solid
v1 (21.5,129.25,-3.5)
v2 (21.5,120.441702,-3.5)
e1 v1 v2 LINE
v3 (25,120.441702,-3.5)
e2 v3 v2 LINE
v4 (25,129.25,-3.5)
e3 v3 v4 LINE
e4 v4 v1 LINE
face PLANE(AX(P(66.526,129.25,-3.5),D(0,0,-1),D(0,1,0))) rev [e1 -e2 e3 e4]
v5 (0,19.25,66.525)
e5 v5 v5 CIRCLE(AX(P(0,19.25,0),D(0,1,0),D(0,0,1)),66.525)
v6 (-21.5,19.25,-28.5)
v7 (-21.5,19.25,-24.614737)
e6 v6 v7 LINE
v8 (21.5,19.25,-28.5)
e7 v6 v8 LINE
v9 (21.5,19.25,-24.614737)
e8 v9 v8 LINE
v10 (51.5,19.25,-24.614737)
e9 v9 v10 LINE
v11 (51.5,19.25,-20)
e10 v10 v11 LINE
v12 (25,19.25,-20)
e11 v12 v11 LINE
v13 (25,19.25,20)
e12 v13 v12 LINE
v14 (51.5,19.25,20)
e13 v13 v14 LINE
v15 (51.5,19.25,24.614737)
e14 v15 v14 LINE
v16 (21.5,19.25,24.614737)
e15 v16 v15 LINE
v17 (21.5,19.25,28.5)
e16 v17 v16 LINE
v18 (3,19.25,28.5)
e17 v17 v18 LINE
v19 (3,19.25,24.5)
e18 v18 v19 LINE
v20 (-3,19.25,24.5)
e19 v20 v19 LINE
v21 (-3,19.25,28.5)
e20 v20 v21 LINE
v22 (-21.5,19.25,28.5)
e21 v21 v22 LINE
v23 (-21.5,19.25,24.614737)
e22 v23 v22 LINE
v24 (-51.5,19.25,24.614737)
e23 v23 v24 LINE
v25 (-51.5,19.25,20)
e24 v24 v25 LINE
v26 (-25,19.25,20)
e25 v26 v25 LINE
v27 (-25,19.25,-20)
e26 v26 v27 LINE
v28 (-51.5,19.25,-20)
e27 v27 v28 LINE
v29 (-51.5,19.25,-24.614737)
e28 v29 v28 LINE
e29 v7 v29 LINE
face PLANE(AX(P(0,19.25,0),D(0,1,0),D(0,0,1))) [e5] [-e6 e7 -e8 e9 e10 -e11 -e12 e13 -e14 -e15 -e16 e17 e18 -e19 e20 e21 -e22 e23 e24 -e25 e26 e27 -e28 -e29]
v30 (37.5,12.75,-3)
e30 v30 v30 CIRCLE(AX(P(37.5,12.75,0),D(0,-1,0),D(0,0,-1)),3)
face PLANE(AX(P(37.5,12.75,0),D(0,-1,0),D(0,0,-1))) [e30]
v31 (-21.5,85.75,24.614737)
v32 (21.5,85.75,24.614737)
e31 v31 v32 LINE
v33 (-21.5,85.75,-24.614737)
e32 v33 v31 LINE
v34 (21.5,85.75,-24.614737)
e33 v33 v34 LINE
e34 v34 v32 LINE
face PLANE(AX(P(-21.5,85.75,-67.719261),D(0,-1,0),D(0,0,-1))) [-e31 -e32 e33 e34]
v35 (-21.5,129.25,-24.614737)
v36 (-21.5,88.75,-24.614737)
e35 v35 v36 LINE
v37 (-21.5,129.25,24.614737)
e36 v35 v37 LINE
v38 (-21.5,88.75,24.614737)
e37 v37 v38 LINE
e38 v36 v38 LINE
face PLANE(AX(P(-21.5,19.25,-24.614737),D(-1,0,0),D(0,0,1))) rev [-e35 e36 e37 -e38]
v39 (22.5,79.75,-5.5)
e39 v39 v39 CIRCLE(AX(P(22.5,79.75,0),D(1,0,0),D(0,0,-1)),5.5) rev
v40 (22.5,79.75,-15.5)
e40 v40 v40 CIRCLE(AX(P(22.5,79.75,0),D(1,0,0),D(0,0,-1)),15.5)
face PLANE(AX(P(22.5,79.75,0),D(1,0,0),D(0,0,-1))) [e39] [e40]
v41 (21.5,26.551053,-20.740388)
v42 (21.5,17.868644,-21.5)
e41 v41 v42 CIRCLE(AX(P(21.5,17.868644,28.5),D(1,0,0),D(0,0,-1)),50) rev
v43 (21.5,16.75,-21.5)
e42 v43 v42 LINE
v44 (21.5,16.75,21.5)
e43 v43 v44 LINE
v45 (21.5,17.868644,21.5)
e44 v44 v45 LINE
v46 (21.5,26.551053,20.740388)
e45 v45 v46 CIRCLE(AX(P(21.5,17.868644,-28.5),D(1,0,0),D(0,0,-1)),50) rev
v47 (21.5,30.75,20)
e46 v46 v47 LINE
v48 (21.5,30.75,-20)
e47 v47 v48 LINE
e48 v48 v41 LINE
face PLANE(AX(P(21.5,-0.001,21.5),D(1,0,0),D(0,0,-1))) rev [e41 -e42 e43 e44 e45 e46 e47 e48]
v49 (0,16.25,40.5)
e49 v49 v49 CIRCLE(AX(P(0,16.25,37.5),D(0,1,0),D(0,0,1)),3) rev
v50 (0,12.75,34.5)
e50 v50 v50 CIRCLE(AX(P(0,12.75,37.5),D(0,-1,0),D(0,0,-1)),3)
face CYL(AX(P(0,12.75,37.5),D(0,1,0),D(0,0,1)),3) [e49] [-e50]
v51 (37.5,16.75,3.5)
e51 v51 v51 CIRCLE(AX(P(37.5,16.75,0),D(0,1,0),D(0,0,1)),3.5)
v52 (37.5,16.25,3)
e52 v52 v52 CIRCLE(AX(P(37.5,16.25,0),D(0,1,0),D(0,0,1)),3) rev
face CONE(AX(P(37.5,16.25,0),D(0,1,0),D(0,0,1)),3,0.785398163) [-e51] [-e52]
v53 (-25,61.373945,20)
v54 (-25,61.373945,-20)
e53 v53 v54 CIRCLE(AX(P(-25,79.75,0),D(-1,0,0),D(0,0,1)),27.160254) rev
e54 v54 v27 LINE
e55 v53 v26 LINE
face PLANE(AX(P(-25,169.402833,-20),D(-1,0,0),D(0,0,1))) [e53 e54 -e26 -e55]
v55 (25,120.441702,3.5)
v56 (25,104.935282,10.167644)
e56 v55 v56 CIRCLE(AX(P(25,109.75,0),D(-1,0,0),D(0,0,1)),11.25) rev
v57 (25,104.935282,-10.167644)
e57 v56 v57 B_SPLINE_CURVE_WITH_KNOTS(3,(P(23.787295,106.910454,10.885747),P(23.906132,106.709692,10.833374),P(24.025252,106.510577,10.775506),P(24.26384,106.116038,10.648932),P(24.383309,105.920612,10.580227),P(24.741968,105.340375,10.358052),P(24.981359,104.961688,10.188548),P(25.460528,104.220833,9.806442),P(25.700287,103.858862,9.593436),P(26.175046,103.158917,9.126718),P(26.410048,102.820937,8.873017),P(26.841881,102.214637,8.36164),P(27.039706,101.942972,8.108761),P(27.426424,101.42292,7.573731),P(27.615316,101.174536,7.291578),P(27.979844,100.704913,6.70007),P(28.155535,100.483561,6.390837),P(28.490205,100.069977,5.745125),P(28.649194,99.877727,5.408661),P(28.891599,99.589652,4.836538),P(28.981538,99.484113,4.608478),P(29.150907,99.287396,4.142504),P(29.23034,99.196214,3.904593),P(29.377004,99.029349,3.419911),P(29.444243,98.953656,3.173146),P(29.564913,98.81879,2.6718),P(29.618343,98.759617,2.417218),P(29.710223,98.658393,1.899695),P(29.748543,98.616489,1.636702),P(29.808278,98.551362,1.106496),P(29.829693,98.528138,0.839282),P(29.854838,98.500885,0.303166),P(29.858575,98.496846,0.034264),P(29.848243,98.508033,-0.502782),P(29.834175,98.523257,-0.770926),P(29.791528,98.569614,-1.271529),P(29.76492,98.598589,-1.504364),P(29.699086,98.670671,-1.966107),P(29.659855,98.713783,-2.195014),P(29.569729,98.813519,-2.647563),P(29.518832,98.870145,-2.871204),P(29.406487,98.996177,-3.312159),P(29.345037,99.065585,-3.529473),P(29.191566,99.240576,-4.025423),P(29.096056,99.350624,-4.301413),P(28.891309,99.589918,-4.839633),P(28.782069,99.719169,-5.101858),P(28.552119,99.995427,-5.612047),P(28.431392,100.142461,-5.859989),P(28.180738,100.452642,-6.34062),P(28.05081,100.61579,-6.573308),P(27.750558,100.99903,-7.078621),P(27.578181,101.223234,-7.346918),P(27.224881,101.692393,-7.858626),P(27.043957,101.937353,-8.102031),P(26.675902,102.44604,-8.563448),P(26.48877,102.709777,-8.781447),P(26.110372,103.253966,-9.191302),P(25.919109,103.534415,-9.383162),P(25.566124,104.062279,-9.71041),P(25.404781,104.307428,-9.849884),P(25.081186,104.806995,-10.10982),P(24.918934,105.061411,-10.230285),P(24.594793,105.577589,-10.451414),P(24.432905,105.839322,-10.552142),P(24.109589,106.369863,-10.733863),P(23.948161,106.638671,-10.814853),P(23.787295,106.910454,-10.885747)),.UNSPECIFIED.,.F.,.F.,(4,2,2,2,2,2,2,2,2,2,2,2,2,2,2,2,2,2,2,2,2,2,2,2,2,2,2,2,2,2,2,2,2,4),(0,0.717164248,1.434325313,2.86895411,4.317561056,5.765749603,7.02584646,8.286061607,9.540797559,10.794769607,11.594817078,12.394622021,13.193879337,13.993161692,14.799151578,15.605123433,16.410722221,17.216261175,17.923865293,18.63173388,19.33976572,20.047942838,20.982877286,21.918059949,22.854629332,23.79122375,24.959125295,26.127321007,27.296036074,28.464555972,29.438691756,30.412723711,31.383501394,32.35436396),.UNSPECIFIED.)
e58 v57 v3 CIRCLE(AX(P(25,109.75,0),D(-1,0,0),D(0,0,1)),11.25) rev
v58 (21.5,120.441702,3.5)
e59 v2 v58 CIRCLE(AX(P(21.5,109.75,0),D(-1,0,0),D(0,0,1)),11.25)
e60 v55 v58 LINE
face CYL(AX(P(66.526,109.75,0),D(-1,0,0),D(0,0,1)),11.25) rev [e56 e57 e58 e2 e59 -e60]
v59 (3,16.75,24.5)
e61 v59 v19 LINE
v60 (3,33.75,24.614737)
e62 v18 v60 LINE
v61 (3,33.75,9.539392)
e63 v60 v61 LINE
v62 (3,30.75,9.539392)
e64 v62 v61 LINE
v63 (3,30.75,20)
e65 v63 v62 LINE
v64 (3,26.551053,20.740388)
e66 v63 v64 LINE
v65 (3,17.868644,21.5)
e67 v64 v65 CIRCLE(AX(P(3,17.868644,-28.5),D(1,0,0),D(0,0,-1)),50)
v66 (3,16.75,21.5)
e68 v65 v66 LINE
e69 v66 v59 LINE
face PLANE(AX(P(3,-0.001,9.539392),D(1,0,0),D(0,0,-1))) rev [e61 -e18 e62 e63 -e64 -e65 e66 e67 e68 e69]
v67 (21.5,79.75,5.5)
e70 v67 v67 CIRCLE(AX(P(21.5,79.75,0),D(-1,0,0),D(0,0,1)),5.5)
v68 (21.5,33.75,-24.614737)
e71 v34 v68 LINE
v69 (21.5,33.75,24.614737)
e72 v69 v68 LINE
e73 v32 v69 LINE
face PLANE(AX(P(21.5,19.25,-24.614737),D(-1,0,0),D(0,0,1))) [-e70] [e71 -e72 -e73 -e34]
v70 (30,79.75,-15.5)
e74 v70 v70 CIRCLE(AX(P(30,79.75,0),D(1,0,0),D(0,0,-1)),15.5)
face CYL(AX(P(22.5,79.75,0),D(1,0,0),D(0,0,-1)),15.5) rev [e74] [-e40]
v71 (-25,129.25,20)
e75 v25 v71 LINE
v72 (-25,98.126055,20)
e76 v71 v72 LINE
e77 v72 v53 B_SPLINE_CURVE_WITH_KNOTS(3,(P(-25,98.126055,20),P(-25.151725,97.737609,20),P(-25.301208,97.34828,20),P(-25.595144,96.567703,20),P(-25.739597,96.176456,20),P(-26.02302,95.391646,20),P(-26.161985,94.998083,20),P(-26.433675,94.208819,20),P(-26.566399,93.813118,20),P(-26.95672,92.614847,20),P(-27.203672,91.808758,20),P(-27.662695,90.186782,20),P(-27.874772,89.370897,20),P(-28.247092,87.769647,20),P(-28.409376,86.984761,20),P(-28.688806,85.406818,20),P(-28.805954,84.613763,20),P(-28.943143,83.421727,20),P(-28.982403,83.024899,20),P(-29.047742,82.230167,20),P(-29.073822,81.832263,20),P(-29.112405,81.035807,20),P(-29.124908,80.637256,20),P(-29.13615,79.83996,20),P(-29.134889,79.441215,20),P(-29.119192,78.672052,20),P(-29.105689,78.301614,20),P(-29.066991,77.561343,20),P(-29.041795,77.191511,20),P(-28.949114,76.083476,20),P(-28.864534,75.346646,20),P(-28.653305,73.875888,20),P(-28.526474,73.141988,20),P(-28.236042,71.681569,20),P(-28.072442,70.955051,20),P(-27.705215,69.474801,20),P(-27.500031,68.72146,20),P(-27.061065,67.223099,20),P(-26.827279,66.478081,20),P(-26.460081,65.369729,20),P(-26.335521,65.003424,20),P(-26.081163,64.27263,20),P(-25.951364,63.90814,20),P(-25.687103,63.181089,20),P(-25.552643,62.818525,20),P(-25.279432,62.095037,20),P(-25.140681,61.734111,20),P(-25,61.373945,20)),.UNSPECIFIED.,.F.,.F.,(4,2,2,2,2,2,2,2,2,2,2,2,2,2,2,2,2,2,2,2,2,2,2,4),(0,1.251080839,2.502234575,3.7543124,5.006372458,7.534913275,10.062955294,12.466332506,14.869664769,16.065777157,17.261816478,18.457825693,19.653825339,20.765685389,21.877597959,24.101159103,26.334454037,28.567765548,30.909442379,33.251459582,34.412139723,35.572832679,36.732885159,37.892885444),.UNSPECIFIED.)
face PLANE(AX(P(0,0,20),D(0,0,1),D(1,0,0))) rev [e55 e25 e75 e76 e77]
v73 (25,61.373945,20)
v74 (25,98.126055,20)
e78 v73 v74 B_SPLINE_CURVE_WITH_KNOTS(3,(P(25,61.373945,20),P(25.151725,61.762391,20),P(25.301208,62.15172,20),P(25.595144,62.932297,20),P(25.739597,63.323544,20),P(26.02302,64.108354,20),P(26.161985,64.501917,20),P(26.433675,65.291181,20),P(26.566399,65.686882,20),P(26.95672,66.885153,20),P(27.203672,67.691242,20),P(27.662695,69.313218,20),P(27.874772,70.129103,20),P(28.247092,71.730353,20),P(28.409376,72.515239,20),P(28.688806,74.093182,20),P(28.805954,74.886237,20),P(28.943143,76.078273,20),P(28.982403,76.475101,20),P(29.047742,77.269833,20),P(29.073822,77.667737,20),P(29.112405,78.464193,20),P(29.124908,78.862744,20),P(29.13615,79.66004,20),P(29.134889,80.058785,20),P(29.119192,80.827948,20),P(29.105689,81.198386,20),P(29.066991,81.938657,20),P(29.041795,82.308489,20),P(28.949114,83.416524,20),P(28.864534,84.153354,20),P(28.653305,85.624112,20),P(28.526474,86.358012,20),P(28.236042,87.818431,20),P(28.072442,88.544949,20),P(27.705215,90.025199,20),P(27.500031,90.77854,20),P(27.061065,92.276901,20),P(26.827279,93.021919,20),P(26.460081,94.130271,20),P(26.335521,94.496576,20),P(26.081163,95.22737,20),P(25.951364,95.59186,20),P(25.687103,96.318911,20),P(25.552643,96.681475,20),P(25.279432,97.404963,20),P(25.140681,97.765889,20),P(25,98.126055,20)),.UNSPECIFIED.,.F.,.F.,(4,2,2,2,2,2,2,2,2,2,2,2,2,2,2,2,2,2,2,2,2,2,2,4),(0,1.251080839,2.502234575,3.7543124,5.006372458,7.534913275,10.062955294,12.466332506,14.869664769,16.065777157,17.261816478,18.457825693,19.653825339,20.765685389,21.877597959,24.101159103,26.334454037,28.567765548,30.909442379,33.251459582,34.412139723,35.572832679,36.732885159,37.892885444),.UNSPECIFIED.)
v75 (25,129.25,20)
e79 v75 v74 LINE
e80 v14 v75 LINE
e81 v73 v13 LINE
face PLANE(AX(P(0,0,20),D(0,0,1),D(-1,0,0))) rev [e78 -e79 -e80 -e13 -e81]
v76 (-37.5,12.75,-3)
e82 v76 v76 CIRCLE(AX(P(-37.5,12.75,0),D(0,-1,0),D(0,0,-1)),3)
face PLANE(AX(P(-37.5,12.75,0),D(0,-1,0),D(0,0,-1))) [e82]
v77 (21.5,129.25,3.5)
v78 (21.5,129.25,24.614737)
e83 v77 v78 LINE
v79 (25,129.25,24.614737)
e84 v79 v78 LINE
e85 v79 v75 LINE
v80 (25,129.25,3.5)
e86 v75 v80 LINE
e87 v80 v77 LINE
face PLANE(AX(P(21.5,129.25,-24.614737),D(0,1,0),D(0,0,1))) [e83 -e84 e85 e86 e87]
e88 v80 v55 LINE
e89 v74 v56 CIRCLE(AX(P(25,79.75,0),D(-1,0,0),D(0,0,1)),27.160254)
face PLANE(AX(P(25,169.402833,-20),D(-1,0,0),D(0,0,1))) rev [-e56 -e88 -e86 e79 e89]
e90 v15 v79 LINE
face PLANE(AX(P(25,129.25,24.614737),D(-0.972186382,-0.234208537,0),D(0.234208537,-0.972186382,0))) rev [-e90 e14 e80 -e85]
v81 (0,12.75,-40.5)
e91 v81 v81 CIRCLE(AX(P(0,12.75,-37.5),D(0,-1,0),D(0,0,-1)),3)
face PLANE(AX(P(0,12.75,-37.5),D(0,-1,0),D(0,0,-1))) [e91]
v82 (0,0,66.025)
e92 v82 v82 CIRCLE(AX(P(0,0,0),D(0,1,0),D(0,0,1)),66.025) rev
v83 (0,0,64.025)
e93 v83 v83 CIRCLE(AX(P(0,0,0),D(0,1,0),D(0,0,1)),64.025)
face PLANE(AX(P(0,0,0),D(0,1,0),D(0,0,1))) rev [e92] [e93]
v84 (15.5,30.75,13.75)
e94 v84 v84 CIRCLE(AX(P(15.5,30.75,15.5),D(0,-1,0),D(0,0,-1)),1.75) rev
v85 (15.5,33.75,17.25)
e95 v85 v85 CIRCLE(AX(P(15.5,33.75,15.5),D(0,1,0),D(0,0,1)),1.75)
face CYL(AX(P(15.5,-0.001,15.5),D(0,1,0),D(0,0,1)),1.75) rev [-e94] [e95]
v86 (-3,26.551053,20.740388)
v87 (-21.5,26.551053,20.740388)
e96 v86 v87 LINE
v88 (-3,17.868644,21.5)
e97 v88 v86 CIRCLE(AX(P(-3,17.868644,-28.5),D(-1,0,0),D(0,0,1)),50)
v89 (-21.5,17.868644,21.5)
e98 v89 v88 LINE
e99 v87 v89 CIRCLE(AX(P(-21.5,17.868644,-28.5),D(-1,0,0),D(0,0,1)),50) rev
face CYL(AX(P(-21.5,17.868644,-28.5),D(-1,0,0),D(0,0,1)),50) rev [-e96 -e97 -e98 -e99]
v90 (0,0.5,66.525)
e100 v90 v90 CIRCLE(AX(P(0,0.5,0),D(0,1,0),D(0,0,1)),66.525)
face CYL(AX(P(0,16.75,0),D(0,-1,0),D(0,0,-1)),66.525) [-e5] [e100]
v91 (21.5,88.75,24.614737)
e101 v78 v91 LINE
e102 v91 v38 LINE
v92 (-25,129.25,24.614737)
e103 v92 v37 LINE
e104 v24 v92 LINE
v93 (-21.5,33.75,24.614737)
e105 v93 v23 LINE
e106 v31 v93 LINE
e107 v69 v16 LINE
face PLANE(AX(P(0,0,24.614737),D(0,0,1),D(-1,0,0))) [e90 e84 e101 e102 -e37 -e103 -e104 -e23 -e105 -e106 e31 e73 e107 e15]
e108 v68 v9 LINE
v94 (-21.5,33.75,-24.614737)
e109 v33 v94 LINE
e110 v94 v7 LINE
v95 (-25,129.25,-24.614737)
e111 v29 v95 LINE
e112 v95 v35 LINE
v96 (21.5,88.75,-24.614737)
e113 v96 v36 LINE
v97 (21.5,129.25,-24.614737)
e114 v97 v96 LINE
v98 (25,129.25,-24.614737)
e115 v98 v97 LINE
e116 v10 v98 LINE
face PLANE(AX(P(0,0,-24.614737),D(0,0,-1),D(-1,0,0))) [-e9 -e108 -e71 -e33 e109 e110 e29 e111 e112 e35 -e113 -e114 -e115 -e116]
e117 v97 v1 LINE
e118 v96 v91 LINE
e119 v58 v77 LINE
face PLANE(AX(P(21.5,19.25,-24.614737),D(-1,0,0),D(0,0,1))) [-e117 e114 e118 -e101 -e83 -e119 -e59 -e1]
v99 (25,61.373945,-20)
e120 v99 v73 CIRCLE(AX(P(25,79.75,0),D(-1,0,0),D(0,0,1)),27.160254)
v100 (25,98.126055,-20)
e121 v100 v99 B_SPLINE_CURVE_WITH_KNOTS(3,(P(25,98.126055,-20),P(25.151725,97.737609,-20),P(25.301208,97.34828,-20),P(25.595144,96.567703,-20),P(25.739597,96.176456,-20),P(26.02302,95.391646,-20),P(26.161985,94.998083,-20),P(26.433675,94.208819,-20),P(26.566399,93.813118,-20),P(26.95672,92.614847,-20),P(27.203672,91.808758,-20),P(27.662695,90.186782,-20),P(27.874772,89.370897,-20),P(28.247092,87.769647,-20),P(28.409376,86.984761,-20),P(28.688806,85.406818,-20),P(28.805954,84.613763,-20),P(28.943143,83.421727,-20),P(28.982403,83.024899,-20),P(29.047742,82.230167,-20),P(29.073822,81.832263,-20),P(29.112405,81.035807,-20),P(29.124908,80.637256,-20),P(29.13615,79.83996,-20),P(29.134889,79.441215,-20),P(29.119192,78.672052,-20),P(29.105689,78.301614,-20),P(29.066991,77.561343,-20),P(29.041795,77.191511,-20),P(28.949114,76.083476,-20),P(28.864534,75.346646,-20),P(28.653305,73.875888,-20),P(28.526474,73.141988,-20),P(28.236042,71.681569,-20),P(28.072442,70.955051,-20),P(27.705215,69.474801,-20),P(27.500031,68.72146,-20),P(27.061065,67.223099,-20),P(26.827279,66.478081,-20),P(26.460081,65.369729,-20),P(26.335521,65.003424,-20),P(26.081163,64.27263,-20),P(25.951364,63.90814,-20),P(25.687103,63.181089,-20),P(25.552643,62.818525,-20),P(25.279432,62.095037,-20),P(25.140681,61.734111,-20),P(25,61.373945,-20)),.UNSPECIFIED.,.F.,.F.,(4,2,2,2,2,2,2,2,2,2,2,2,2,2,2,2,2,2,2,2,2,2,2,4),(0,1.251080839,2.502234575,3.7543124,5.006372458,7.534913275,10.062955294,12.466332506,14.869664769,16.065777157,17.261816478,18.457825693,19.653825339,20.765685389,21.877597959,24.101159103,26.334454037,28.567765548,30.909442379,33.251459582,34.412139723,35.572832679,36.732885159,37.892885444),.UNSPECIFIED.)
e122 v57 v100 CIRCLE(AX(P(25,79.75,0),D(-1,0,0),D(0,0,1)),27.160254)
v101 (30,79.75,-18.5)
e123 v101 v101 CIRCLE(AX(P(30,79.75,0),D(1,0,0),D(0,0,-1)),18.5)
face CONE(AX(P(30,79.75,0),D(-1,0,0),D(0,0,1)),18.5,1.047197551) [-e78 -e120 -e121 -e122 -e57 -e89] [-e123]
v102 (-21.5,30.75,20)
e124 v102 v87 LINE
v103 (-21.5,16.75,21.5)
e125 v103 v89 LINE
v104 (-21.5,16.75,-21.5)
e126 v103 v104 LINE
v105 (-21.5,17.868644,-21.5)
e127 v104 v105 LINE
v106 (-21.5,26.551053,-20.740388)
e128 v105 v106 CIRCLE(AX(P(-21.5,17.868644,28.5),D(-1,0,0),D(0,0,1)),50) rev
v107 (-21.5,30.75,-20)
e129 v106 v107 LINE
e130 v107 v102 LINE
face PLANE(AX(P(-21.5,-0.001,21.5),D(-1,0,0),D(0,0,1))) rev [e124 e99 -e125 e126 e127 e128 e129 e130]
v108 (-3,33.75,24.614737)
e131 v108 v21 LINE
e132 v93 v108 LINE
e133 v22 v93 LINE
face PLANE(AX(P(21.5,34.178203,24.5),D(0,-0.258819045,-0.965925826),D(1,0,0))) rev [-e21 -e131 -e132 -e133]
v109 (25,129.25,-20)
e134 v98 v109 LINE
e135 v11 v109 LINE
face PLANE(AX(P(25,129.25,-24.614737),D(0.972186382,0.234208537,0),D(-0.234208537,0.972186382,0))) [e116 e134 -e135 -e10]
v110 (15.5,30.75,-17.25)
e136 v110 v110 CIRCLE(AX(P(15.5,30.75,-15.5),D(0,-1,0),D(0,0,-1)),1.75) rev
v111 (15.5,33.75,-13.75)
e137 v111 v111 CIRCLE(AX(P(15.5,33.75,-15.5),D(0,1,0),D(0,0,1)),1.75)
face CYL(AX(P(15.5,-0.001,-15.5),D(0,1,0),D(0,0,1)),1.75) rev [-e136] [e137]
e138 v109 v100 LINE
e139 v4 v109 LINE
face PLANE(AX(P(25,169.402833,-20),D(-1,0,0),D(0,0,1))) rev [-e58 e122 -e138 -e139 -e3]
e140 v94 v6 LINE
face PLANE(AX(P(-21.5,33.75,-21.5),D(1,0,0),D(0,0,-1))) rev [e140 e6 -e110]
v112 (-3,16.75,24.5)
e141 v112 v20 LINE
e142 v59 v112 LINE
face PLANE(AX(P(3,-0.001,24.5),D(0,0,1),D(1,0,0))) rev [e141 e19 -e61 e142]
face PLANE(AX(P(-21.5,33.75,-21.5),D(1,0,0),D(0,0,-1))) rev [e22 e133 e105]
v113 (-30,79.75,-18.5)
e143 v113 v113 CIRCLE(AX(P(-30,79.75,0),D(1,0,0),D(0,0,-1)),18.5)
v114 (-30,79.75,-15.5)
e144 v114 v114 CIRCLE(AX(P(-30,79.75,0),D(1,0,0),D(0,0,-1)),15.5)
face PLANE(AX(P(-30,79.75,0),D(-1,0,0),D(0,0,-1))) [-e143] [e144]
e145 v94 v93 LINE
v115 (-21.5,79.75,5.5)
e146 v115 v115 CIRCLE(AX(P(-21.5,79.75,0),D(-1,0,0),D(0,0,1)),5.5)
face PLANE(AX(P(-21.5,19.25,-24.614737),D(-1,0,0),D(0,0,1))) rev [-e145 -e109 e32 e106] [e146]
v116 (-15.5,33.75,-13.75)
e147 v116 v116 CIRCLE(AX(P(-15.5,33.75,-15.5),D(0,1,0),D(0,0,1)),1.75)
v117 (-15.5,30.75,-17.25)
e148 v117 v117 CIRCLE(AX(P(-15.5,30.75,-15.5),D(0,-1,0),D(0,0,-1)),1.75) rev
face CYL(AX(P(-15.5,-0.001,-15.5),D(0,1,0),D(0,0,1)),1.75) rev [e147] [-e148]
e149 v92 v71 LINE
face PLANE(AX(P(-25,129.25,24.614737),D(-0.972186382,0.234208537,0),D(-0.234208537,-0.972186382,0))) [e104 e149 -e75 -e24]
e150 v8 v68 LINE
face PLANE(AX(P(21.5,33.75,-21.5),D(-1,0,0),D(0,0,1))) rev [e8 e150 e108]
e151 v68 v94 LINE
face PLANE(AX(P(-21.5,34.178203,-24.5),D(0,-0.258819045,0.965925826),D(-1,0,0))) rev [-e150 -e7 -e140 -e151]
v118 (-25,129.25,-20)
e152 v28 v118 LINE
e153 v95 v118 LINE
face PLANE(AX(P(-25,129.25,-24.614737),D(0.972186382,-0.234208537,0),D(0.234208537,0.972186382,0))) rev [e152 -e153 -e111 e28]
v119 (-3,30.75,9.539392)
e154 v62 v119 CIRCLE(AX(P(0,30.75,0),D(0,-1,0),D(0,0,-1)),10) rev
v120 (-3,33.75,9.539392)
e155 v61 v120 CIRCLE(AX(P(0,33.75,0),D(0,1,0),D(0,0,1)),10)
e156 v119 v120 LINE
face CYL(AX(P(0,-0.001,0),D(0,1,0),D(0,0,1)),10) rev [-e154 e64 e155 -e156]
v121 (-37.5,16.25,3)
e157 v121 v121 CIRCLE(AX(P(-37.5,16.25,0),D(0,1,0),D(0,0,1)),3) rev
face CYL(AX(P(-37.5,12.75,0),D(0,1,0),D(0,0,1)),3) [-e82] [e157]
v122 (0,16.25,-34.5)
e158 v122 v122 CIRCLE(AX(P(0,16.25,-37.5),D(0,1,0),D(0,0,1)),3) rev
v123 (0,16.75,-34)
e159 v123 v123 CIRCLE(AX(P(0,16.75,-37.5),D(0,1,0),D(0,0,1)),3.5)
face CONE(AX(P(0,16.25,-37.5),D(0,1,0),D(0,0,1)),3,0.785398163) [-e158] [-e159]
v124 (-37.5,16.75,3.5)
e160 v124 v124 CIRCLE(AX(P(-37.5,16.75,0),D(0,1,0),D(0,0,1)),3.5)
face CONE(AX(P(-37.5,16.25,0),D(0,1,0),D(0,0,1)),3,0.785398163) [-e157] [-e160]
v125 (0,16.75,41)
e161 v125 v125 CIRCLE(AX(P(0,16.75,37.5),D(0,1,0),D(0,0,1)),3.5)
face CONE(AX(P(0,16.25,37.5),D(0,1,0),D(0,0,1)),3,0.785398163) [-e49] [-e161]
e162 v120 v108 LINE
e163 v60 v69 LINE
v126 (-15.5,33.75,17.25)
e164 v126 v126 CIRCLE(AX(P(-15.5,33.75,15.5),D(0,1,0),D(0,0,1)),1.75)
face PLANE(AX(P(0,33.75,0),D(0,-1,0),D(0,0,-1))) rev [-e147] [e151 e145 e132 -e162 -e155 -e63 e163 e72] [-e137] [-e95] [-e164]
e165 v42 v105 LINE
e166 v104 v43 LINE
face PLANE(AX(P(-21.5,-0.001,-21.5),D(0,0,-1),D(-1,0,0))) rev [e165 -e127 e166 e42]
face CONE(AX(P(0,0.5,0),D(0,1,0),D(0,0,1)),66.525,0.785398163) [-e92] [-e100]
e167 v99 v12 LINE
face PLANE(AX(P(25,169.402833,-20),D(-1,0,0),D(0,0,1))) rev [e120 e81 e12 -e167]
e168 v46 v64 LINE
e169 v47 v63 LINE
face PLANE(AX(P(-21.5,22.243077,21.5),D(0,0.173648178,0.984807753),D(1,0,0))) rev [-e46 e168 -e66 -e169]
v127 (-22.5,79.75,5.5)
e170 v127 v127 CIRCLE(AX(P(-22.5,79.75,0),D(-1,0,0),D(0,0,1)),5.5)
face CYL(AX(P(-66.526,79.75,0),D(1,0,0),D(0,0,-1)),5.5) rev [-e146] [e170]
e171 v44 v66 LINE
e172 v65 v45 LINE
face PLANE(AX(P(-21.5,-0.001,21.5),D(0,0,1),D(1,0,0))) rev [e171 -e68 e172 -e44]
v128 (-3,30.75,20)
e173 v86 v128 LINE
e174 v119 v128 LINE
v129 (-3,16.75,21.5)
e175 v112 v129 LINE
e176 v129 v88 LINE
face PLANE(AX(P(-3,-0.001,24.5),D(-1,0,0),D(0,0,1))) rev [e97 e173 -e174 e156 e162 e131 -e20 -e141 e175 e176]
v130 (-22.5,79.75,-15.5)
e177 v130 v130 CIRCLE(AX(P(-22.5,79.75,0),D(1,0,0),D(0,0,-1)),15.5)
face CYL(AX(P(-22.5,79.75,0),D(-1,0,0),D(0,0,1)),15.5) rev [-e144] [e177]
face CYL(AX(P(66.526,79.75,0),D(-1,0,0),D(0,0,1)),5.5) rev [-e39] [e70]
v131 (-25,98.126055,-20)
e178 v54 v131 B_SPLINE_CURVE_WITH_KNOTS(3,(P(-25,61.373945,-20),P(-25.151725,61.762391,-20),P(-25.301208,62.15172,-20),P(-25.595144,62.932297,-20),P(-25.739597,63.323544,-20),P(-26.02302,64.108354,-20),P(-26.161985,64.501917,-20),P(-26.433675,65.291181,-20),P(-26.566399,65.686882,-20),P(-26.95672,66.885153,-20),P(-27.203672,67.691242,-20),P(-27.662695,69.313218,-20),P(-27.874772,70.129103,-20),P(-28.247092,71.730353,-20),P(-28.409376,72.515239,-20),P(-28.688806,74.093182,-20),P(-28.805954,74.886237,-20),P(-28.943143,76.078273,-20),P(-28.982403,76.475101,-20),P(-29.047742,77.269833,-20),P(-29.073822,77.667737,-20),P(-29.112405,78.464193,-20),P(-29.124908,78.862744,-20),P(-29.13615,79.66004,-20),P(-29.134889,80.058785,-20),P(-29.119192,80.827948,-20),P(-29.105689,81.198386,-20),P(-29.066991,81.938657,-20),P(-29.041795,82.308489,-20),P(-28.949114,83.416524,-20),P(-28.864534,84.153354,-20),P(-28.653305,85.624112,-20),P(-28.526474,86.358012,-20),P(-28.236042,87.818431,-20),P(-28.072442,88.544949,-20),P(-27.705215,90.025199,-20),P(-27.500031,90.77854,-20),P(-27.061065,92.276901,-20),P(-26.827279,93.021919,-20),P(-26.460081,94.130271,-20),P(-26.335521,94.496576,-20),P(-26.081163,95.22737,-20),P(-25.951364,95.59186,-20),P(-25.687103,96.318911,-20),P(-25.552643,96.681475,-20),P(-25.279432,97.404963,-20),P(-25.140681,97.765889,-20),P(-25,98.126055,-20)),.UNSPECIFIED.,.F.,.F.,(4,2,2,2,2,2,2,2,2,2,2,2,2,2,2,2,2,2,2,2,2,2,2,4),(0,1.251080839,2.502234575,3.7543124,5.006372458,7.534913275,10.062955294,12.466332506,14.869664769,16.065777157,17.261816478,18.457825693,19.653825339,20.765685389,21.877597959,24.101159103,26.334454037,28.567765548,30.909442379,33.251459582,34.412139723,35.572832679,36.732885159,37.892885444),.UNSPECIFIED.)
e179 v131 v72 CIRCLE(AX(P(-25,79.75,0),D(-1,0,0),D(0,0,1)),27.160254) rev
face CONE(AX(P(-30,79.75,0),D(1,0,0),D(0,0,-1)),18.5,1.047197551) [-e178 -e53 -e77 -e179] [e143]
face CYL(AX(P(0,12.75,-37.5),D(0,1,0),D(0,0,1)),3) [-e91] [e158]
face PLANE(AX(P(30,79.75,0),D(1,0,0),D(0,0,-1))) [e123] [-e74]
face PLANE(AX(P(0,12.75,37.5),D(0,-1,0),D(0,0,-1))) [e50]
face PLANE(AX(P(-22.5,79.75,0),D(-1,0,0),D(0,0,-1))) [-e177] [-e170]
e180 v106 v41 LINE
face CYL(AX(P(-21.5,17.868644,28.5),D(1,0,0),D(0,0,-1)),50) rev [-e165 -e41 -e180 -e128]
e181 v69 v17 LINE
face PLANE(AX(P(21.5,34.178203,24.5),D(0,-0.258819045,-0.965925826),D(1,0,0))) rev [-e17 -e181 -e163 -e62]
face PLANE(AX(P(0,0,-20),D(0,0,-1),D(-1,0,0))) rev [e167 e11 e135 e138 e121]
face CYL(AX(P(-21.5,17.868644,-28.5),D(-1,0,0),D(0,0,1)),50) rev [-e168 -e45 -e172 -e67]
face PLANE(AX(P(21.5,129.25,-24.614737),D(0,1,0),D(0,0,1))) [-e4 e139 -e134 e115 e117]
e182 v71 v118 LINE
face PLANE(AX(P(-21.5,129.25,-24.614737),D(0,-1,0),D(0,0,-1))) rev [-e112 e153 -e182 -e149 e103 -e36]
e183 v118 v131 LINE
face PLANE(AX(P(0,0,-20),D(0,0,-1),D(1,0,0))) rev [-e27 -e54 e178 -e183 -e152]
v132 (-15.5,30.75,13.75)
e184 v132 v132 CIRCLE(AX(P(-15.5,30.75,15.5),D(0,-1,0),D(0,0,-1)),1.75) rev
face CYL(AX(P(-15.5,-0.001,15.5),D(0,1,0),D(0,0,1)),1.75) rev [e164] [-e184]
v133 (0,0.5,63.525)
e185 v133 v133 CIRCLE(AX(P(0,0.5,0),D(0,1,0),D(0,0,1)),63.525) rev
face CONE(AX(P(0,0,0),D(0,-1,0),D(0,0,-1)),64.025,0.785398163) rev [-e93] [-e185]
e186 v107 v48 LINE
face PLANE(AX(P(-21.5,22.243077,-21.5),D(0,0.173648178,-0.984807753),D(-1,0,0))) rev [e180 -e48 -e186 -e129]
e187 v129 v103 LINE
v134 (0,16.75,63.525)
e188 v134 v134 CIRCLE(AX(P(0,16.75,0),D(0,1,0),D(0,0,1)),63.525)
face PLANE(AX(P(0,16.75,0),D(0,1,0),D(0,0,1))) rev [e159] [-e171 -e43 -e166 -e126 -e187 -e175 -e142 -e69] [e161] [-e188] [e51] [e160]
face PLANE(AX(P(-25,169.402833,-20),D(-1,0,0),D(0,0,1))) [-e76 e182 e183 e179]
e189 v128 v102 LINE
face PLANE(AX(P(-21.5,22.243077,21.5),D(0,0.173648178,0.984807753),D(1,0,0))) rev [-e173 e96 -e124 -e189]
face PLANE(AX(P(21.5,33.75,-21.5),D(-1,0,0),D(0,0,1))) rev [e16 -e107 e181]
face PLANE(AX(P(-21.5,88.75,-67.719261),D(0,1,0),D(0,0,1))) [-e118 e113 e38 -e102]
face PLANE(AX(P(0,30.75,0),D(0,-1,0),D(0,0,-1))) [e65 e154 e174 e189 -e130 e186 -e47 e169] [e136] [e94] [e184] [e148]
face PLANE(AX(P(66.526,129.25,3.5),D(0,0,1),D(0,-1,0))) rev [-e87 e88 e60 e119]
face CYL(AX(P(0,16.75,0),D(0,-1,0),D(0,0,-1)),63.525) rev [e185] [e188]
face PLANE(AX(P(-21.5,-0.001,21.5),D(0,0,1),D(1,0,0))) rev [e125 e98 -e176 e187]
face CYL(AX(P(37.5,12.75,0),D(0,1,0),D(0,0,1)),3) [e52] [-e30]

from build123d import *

# Parameters (mm, degrees)
SKETCH1_R            = 66.525
SKETCH1_R_2          = 63.525
BOSS_EXTRUDE1_DEPTH  = 16.75
SKETCH2_R            = 66.525
BOSS_EXTRUDE2_DEPTH  = 2.5
CHAMFER1_SIZE        = 0.5
SKETCH3_R            = 3
BOSS_EXTRUDE3_DEPTH  = 4
CHAMFER2_SIZE        = 0.5
CUT_EXTRUDE1_REACH   = 98.03
SKETCH4_W            = 43
SKETCH4_H            = 43
SKETCH5_W            = 43
SKETCH5_H            = 3
BOSS_EXTRUDE4_DEPTH  = 14.5
SKETCH6_W            = 43
SKETCH6_H            = 49
BOSS_EXTRUDE5_DEPTH  = 3
CUT_EXTRUDE2_REACH   = 101.951
SKETCH7_R            = 1.75
CHAMFER3_SIZE        = 4
CHAMFER3_SIZE_2      = 14.92820323
CHAMFER5_SIZE        = 1.5
CHAMFER5_SIZE2       = 8.506922729
FILLET1_R            = 50
BOSS_EXTRUDE6_DEPTH  = 4.614737
SKETCH10_W           = 3.5
SKETCH10_H           = 40
BOSS_EXTRUDE7_DEPTH  = 110
CUT_EXTRUDE3_REACH   = 171.94
SKETCH11_R           = 5.5
SKETCH12_R           = 15.5
CUT_EXTRUDE4_DEPTH   = 2.5
BOSS_EXTRUDE8_START  = 5
SKETCH13_R           = 18.5
SKETCH13_R_2         = 15.5
BOSS_EXTRUDE8_DEPTH  = 5
MIRROR4_COPY_1_DEPTH = 4.614737
CHAMFER7_SIZE        = 8.660254038
CHAMFER7_SIZE_2      = 5
SKETCH14_W           = 43
SKETCH14_H           = 3
BOSS_EXTRUDE9_DEPTH  = 49.229473419
CUT_EXTRUDE5_REACH   = 171.94


with BuildPart() as part:
    # Sketch1 → Boss-Extrude1 (new body)
    with BuildSketch(Plane(origin=(0, 0, 0), x_dir=(1, 0, 0), z_dir=(0, 1, 0))):
        with Locations(Location((0, 0, 0), (0, 0, 270))):
            Circle(SKETCH1_R)
        with Locations(Location((0, 0, 0), (0, 0, 270))):
            Circle(SKETCH1_R_2, mode=Mode.SUBTRACT)
    extrude(amount=BOSS_EXTRUDE1_DEPTH)

    # Sketch2 → Boss-Extrude2 (add)
    with BuildSketch(Plane(origin=(0, 16.75, 0), x_dir=(1, 0, 0), z_dir=(0, 1, 0))):
        with Locations(Location((0, 0, 0), (0, 0, 270))):
            Circle(SKETCH2_R)
    extrude(amount=BOSS_EXTRUDE2_DEPTH)

    # Chamfer1
    chamfer1_edges = [part.edges().sort_by_distance(p)[0] for p in [
        (0, 0, -66.525),
        (0, 0, -63.525),
    ]]
    chamfer(chamfer1_edges, length=CHAMFER1_SIZE)

    # Sketch3 → Boss-Extrude3 (add)
    with BuildSketch(Plane.XZ.offset(-16.75)):
        with Locations(Location((0, 37.5, 0), (0, 0, 90))):
            Circle(SKETCH3_R)
        with Locations(Location((37.5, 0, 0), (0, 0, 90))):
            Circle(SKETCH3_R)
        with Locations(Location((0, -37.5, 0), (0, 0, 90))):
            Circle(SKETCH3_R)
        with Locations(Location((-37.5, 0, 0), (0, 0, 90))):
            Circle(SKETCH3_R)
    extrude(amount=BOSS_EXTRUDE3_DEPTH)

    # Chamfer2
    chamfer2_edges = [part.edges().sort_by_distance(p)[0] for p in [
        (0, 16.75, 34.5),
        (37.5, 16.75, -3),
        (0, 16.75, -40.5),
        (-37.5, 16.75, -3),
    ]]
    chamfer(chamfer2_edges, length=CHAMFER2_SIZE)

    # Sketch4 → Cut-Extrude1 (cut, up to next)
    with BuildSketch(Plane(origin=(0, 19.25, 0), x_dir=(1, 0, 0), z_dir=(0, 1, 0)), mode=Mode.PRIVATE) as cut_extrude1_sk1:
        Rectangle(SKETCH4_W, SKETCH4_H)
    cut_extrude1_tool1 = extrude(cut_extrude1_sk1.sketch, amount=-CUT_EXTRUDE1_REACH, mode=Mode.PRIVATE) & part.part
    add(cut_extrude1_tool1.solids().sort_by_distance((0, 19.25, 0))[0], mode=Mode.SUBTRACT)

    # Sketch5 → Boss-Extrude4 (add)
    with BuildSketch(Plane(origin=(0, 19.25, 0), x_dir=(1, 0, 0), z_dir=(0, 1, 0))):
        with Locations((0, 23)):
            Rectangle(SKETCH5_W, SKETCH5_H)
        with Locations((0, -23)):
            Rectangle(SKETCH5_W, SKETCH5_H)
    extrude(amount=BOSS_EXTRUDE4_DEPTH)

    # Sketch6 → Boss-Extrude5 (add)
    with BuildSketch(Plane(origin=(0, 33.75, 0), x_dir=(1, 0, 0), z_dir=(0, 1, 0))):
        Rectangle(SKETCH6_W, SKETCH6_H)
    extrude(amount=-BOSS_EXTRUDE5_DEPTH)

    # Sketch7 → Cut-Extrude2 (cut, up to next)
    with BuildSketch(Plane(origin=(0, 33.75, 0), x_dir=(1, 0, 0), z_dir=(0, 1, 0)), mode=Mode.PRIVATE) as cut_extrude2_sk1:
        with Locations(Location((15.5, 15.5, 0), (0, 0, 270))):
            Circle(SKETCH7_R)
    cut_extrude2_tool1 = extrude(cut_extrude2_sk1.sketch, amount=-CUT_EXTRUDE2_REACH, mode=Mode.PRIVATE) & part.part
    # Sketch7 → Cut-Extrude2 (cut, up to next)
    with BuildSketch(Plane(origin=(0, 33.75, 0), x_dir=(1, 0, 0), z_dir=(0, 1, 0)), mode=Mode.PRIVATE) as cut_extrude2_sk2:
        with Locations(Location((-15.5, 15.5, 0), (0, 0, 270))):
            Circle(SKETCH7_R)
    cut_extrude2_tool2 = extrude(cut_extrude2_sk2.sketch, amount=-CUT_EXTRUDE2_REACH, mode=Mode.PRIVATE) & part.part
    # Sketch7 → Cut-Extrude2 (cut, up to next)
    with BuildSketch(Plane(origin=(0, 33.75, 0), x_dir=(1, 0, 0), z_dir=(0, 1, 0)), mode=Mode.PRIVATE) as cut_extrude2_sk3:
        with Locations(Location((-15.5, -15.5, 0), (0, 0, 270))):
            Circle(SKETCH7_R)
    cut_extrude2_tool3 = extrude(cut_extrude2_sk3.sketch, amount=-CUT_EXTRUDE2_REACH, mode=Mode.PRIVATE) & part.part
    # Sketch7 → Cut-Extrude2 (cut, up to next)
    with BuildSketch(Plane(origin=(0, 33.75, 0), x_dir=(1, 0, 0), z_dir=(0, 1, 0)), mode=Mode.PRIVATE) as cut_extrude2_sk4:
        with Locations(Location((15.5, -15.5, 0), (0, 0, 270))):
            Circle(SKETCH7_R)
    cut_extrude2_tool4 = extrude(cut_extrude2_sk4.sketch, amount=-CUT_EXTRUDE2_REACH, mode=Mode.PRIVATE) & part.part
    # Sketch7 → Cut-Extrude2 (cut, up to next)
    with BuildSketch(Plane(origin=(0, 33.75, 0), x_dir=(1, 0, 0), z_dir=(0, 1, 0)), mode=Mode.PRIVATE) as cut_extrude2_sk5:
        with BuildLine():
            Line((-3, -24.5), (-3, -9.539392014))
            ThreePointArc((-3, -9.539392014), (0, 10), (3, -9.539392014))
            Line((3, -9.539392014), (3, -24.5))
            Line((3, -24.5), (-3, -24.5))
        make_face()
    cut_extrude2_tool5 = extrude(cut_extrude2_sk5.sketch, amount=-CUT_EXTRUDE2_REACH, mode=Mode.PRIVATE) & part.part
    add(cut_extrude2_tool1.solids().sort_by_distance((15.5, 33.75, -15.5))[0], mode=Mode.SUBTRACT)
    add(cut_extrude2_tool2.solids().sort_by_distance((-15.5, 33.75, -15.5))[0], mode=Mode.SUBTRACT)
    add(cut_extrude2_tool3.solids().sort_by_distance((-15.5, 33.75, 15.5))[0], mode=Mode.SUBTRACT)
    add(cut_extrude2_tool4.solids().sort_by_distance((15.5, 33.75, 15.5))[0], mode=Mode.SUBTRACT)
    add(cut_extrude2_tool5.solids().sort_by_distance((0, 33.75, 3.754926))[0], mode=Mode.SUBTRACT)

    # Chamfer3
    # the kernel refuses this chamfer: 14.92820323, 4 mm, written as the material it adds along each edge
    with BuildSketch(Plane(origin=(-35.764387332, 19.25, 24.5), x_dir=(0, -0.13751244702129095, 0.9905000388259542), z_dir=(1, 0, 0))) as chamfer3_piece_1_section:
        Polygon((CHAMFER3_SIZE * 0.990500038826, -CHAMFER3_SIZE * 0.137512447021), (-CHAMFER3_SIZE_2 * 0.137512447024, -CHAMFER3_SIZE_2 * 0.990500038844), (0, 0), align=None)
    chamfer3_piece_1 = extrude(amount=96.028774665, mode=Mode.PRIVATE)
    chamfer3_piece_1 = split(chamfer3_piece_1, bisect_by=Plane(origin=(-3, 24.218107634, 25.834399786), z_dir=(-1, 0, 0)), keep=Keep.TOP, mode=Mode.PRIVATE)
    chamfer3_piece_1 = split(chamfer3_piece_1, bisect_by=Plane(origin=(-21.5, 24.218107634, 25.834399786), z_dir=(1, 0, 0)), keep=Keep.TOP, mode=Mode.PRIVATE)
    chamfer3_piece_1 = split(chamfer3_piece_1, bisect_by=Plane(origin=(-12.25, 33.75, 25.834399786), z_dir=(0, -1, 0)), keep=Keep.TOP, mode=Mode.PRIVATE)
    add(chamfer3_piece_1)
    with BuildSketch(Plane(origin=(3, 19.25, 24.5), x_dir=(0, -0.13751244702129095, 0.9905000388259542), z_dir=(1, 0, 0))) as chamfer3_piece_2_section:
        Polygon((CHAMFER3_SIZE * 0.990500038826, -CHAMFER3_SIZE * 0.137512447021), (-CHAMFER3_SIZE_2 * 0.137512447024, -CHAMFER3_SIZE_2 * 0.990500038844), (0, 0), align=None)
    chamfer3_piece_2 = extrude(amount=18.5, mode=Mode.PRIVATE)
    chamfer3_piece_2 = split(chamfer3_piece_2, bisect_by=Plane(origin=(12.25, 33.75, 25.834399786), z_dir=(0, -1, 0)), keep=Keep.TOP, mode=Mode.PRIVATE)
    add(chamfer3_piece_2)
    with BuildSketch(Plane(origin=(-21.5, 19.25, 24.5), x_dir=(0, -0.13751244702129095, 0.9905000388259542), z_dir=(1, 0, 0))) as chamfer3_piece_3_section:
        Polygon((CHAMFER3_SIZE * 0.990500038826, -CHAMFER3_SIZE * 0.137512447021), (-CHAMFER3_SIZE_2 * 0.137512447024, -CHAMFER3_SIZE_2 * 0.990500038844), (0, 0), align=None)
    chamfer3_piece_3 = extrude(amount=18.5, mode=Mode.PRIVATE)
    chamfer3_piece_3 = split(chamfer3_piece_3, bisect_by=Plane(origin=(-12.25, 33.75, 25.834399786), z_dir=(0, -1, 0)), keep=Keep.TOP, mode=Mode.PRIVATE)
    add(chamfer3_piece_3)
    with BuildSketch(Plane(origin=(-60.264387332, 19.25, 24.5), x_dir=(0, -0.13751244702129095, 0.9905000388259542), z_dir=(1, 0, 0))) as chamfer3_piece_4_section:
        Polygon((CHAMFER3_SIZE * 0.990500038826, -CHAMFER3_SIZE * 0.137512447021), (-CHAMFER3_SIZE_2 * 0.137512447024, -CHAMFER3_SIZE_2 * 0.990500038844), (0, 0), align=None)
    chamfer3_piece_4 = extrude(amount=96.028774665, mode=Mode.PRIVATE)
    chamfer3_piece_4 = split(chamfer3_piece_4, bisect_by=Plane(origin=(3, 24.218107634, 25.834399786), z_dir=(1, 0, 0)), keep=Keep.TOP, mode=Mode.PRIVATE)
    chamfer3_piece_4 = split(chamfer3_piece_4, bisect_by=Plane(origin=(21.5, 24.218107634, 25.834399786), z_dir=(-1, 0, 0)), keep=Keep.TOP, mode=Mode.PRIVATE)
    chamfer3_piece_4 = split(chamfer3_piece_4, bisect_by=Plane(origin=(12.25, 33.75, 25.834399786), z_dir=(0, -1, 0)), keep=Keep.TOP, mode=Mode.PRIVATE)
    add(chamfer3_piece_4)
    with BuildSketch(Plane(origin=(21.5, 19.25, -24.5), x_dir=(0, -0.13751244702129095, -0.9905000388259542), z_dir=(-1, 0, 0))) as chamfer3_piece_5_section:
        Polygon((CHAMFER3_SIZE * 0.990500038826, -CHAMFER3_SIZE * 0.137512447021), (-CHAMFER3_SIZE_2 * 0.137512447024, -CHAMFER3_SIZE_2 * 0.990500038844), (0, 0), align=None)
    chamfer3_piece_5 = extrude(amount=43, mode=Mode.PRIVATE)
    chamfer3_piece_5 = split(chamfer3_piece_5, bisect_by=Plane(origin=(0, 33.75, -25.834399786), z_dir=(0, -1, 0)), keep=Keep.TOP, mode=Mode.PRIVATE)
    add(chamfer3_piece_5)

    # Chamfer5
    chamfer5_edges = [part.edges().sort_by_distance(p)[0] for p in [
        (0, 30.75, -21.5),
        (12.25, 30.75, 21.5),
        (-12.25, 30.75, 21.5),
    ]]
    chamfer5_side = [part.faces().sort_by_distance(p)[0] for p in [
        (0, 30.75, -20.891888168),
    ]]
    chamfer(chamfer5_edges, length=CHAMFER5_SIZE, length2=CHAMFER5_SIZE2, reference=chamfer5_side[0])

    # Fillet1
    # the kernel refuses this fillet: 50 mm, written as the material it adds along each edge
    with BuildSketch(Plane(origin=(-21.5, 22.243077271, -21.5), x_dir=(0, 0.9848077530122084, 0.17364817766692914), z_dir=(1, 0, 0))) as fillet1_piece_1:
        with BuildLine():
            CenterArc((FILLET1_R * 0.0874886635259, FILLET1_R), FILLET1_R, 260, 10)
            Line((-FILLET1_R * 0.086159514141, FILLET1_R * 0.0151922469878), (0, 0))
            Line((0, 0), (FILLET1_R * 0.0874886635259, 0))
        make_face()
    extrude(amount=43)
    with BuildSketch(Plane(origin=(21.5, 22.243077271, 21.5), x_dir=(0, 0.9848077530122081, -0.17364817766692925), z_dir=(-1, 0, 0)), Plane(origin=(-3, 22.243077271, 21.5), x_dir=(0, 0.9848077530122081, -0.17364817766692925), z_dir=(-1, 0, 0))) as fillet1_piece_2:
        with BuildLine():
            CenterArc((FILLET1_R * 0.0874886635259, FILLET1_R), FILLET1_R, 260, 10)
            Line((-FILLET1_R * 0.086159514141, FILLET1_R * 0.0151922469878), (0, 0))
            Line((0, 0), (FILLET1_R * 0.0874886635259, 0))
        make_face()
    extrude(amount=18.5)
    with BuildSketch(Plane(origin=(21.5, 22.243077271, 21.5), x_dir=(0, 0.9848077530122081, -0.17364817766692925), z_dir=(-1, 0, 0))) as fillet1_piece_3_section:
        with BuildLine():
            CenterArc((FILLET1_R * 0.0874886635259, FILLET1_R), FILLET1_R, 260, 10)
            Line((-FILLET1_R * 0.086159514141, FILLET1_R * 0.0151922469878), (0, 0))
            Line((0, 0), (FILLET1_R * 0.0874886635259, 0))
        make_face()
    fillet1_piece_3 = extrude(amount=29.436082941, mode=Mode.PRIVATE)
    fillet1_piece_3 = split(fillet1_piece_3, bisect_by=Plane(origin=(-3, 22.267794389, 21.78251796), z_dir=(-1, 0, 0)), keep=Keep.TOP, mode=Mode.PRIVATE)
    add(fillet1_piece_3)
    with BuildSketch(Plane(origin=(7.936082941, 22.243077271, 21.5), x_dir=(0, 0.9848077530122081, -0.17364817766692925), z_dir=(-1, 0, 0))) as fillet1_piece_4_section:
        with BuildLine():
            CenterArc((FILLET1_R * 0.0874886635259, FILLET1_R), FILLET1_R, 260, 10)
            Line((-FILLET1_R * 0.086159514141, FILLET1_R * 0.0151922469878), (0, 0))
            Line((0, 0), (FILLET1_R * 0.0874886635259, 0))
        make_face()
    fillet1_piece_4 = extrude(amount=29.436082941, mode=Mode.PRIVATE)
    fillet1_piece_4 = split(fillet1_piece_4, bisect_by=Plane(origin=(3, 22.267794389, 21.78251796), z_dir=(1, 0, 0)), keep=Keep.TOP, mode=Mode.PRIVATE)
    add(fillet1_piece_4)

    # Sketch9 → Boss-Extrude6 (add)
    with BuildSketch(Plane.XY.offset(-20)):
        Polygon((21.5, 19.25), (21.5, 129.25), (25, 129.25), (51.5, 19.25), align=None)
    boss_extrude6 = extrude(amount=-BOSS_EXTRUDE6_DEPTH)

    # Mirror3: Boss-Extrude6 across plane
    add(boss_extrude6.mirror(Plane.XY))

    # Sketch10 → Boss-Extrude7 (add)
    with BuildSketch(Plane(origin=(0, 19.25, 0), x_dir=(1, 0, 0), z_dir=(0, 1, 0))):
        with Locations((23.25, 0)):
            Rectangle(SKETCH10_W, SKETCH10_H)
    boss_extrude7 = extrude(amount=BOSS_EXTRUDE7_DEPTH)

    # Sketch11 → Cut-Extrude3 (cut, up to next)
    with BuildSketch(Plane.ZY.offset(-21.5), mode=Mode.PRIVATE) as cut_extrude3_sk1:
        with Locations((0, 79.75)):
            Circle(SKETCH11_R)
    cut_extrude3_tool1 = extrude(cut_extrude3_sk1.sketch, amount=-CUT_EXTRUDE3_REACH, mode=Mode.PRIVATE) & part.part
    cut_extrude3 = cut_extrude3_tool1.solids().sort_by_distance((21.5, 79.75, 0))[0]
    add(cut_extrude3, mode=Mode.SUBTRACT)

    # Sketch12 → Cut-Extrude4 (cut)
    with BuildSketch(Plane(origin=(25, 0, 0), x_dir=(0, 0, -1), z_dir=(1, 0, 0))):
        with Locations((0, 79.75)):
            Circle(SKETCH12_R)
    cut_extrude4 = extrude(amount=-CUT_EXTRUDE4_DEPTH, mode=Mode.SUBTRACT)

    # Sketch13 → Boss-Extrude8 (add)
    with BuildSketch(Plane(origin=(25, 0, 0), x_dir=(0, 0, -1), z_dir=(1, 0, 0)).offset(BOSS_EXTRUDE8_START)):
        with Locations(Location((0, 79.75, 0), (0, 0, 180))):
            Circle(SKETCH13_R)
        with Locations((0, 79.75)):
            Circle(SKETCH13_R_2, mode=Mode.SUBTRACT)
    boss_extrude8 = extrude(amount=-BOSS_EXTRUDE8_DEPTH)

    # Mirror4: Boss-Extrude6, Boss-Extrude7, Cut-Extrude3, Cut-Extrude4, Boss-Extrude8 across plane
    add(boss_extrude6.mirror(Plane(origin=(0, 0, 0), x_dir=(0, 0, 1), z_dir=(1, 0, 0))))
    add(boss_extrude7.mirror(Plane(origin=(0, 0, 0), x_dir=(0, 0, 1), z_dir=(1, 0, 0))))
    add(cut_extrude3.mirror(Plane(origin=(0, 0, 0), x_dir=(0, 0, 1), z_dir=(1, 0, 0))), mode=Mode.SUBTRACT)
    add(cut_extrude4.mirror(Plane(origin=(0, 0, 0), x_dir=(0, 0, 1), z_dir=(1, 0, 0))), mode=Mode.SUBTRACT)
    add(boss_extrude8.mirror(Plane(origin=(0, 0, 0), x_dir=(0, 0, 1), z_dir=(1, 0, 0))))

    # Mirror4 copy 1 sketch → Mirror4 copy 1 (add)
    with BuildSketch(Plane(origin=(0, 0, 20), x_dir=(-1, 0, 0), z_dir=(0, 0, -1))):
        Polygon((21.5, 19.25), (21.5, 129.25), (25, 129.25), (51.5, 19.25), align=None)
    extrude(amount=-MIRROR4_COPY_1_DEPTH)

    # Chamfer7
    # the kernel refuses this chamfer: 8.660254038, 5 mm, written as the material it adds along each edge
    with BuildSketch(Plane(origin=(25, 79.75, 0), x_dir=(0, 0, 1), z_dir=(0, 1, 0))) as chamfer7_piece_1_section:
        Polygon((18.5 + CHAMFER7_SIZE, 0), (18.5, CHAMFER7_SIZE_2), (18.5, 0), align=None)
    chamfer7_piece_1 = revolve(axis=Axis((25, 79.75, 0), (1, 0, 0)), mode=Mode.PRIVATE)
    chamfer7_piece_1 = split(chamfer7_piece_1, bisect_by=Plane(origin=(25.718533096, 57.535930148, -20), z_dir=(0, 0, 1)), keep=Keep.TOP, mode=Mode.PRIVATE)
    chamfer7_piece_1 = split(chamfer7_piece_1, bisect_by=Plane(origin=(25.718533096, 57.535930148, 24.614737), z_dir=(0, 0, -1)), keep=Keep.TOP, mode=Mode.PRIVATE)
    add(chamfer7_piece_1)
    with BuildSketch(Plane(origin=(-25, 79.75, 0), x_dir=(0, 0, 1), z_dir=(0, 1, 0))) as chamfer7_piece_2_section:
        Polygon((18.5 + CHAMFER7_SIZE, 0), (18.5, -CHAMFER7_SIZE_2), (18.5, 0), align=None)
    chamfer7_piece_2 = revolve(axis=Axis((-25, 79.75, 0), (1, 0, 0)), mode=Mode.PRIVATE)
    chamfer7_piece_2 = split(chamfer7_piece_2, bisect_by=Plane(origin=(-25.718533096, 57.535930148, 20), z_dir=(0, 0, -1)), keep=Keep.TOP, mode=Mode.PRIVATE)
    chamfer7_piece_2 = split(chamfer7_piece_2, bisect_by=Plane(origin=(-25.718533096, 57.535930148, -24.614737), z_dir=(0, 0, 1)), keep=Keep.TOP, mode=Mode.PRIVATE)
    add(chamfer7_piece_2)

    # Sketch14 → Boss-Extrude9 (add)
    with BuildSketch(Plane.XY.offset(24.61473671)):
        with Locations((0, 87.25)):
            Rectangle(SKETCH14_W, SKETCH14_H)
    extrude(amount=-BOSS_EXTRUDE9_DEPTH)

    # Sketch15 → Cut-Extrude5 (cut, up to next)
    with BuildSketch(Plane.ZY.offset(-21.5), mode=Mode.PRIVATE) as cut_extrude5_sk1:
        with BuildLine():
            Line((-3.5, 129.25), (-3.5, 120.44170239))
            ThreePointArc((-3.5, 120.44170239), (0, 98.5), (3.5, 120.44170239))
            Line((3.5, 120.44170239), (3.5, 129.25))
            Line((3.5, 129.25), (-3.5, 129.25))
        make_face()
    cut_extrude5_tool1 = extrude(cut_extrude5_sk1.sketch, amount=-CUT_EXTRUDE5_REACH, mode=Mode.PRIVATE) & part.part
    add(cut_extrude5_tool1.solids().sort_by_distance((21.5, 111.7257, 0))[0], mode=Mode.SUBTRACT)


solid = part.part
